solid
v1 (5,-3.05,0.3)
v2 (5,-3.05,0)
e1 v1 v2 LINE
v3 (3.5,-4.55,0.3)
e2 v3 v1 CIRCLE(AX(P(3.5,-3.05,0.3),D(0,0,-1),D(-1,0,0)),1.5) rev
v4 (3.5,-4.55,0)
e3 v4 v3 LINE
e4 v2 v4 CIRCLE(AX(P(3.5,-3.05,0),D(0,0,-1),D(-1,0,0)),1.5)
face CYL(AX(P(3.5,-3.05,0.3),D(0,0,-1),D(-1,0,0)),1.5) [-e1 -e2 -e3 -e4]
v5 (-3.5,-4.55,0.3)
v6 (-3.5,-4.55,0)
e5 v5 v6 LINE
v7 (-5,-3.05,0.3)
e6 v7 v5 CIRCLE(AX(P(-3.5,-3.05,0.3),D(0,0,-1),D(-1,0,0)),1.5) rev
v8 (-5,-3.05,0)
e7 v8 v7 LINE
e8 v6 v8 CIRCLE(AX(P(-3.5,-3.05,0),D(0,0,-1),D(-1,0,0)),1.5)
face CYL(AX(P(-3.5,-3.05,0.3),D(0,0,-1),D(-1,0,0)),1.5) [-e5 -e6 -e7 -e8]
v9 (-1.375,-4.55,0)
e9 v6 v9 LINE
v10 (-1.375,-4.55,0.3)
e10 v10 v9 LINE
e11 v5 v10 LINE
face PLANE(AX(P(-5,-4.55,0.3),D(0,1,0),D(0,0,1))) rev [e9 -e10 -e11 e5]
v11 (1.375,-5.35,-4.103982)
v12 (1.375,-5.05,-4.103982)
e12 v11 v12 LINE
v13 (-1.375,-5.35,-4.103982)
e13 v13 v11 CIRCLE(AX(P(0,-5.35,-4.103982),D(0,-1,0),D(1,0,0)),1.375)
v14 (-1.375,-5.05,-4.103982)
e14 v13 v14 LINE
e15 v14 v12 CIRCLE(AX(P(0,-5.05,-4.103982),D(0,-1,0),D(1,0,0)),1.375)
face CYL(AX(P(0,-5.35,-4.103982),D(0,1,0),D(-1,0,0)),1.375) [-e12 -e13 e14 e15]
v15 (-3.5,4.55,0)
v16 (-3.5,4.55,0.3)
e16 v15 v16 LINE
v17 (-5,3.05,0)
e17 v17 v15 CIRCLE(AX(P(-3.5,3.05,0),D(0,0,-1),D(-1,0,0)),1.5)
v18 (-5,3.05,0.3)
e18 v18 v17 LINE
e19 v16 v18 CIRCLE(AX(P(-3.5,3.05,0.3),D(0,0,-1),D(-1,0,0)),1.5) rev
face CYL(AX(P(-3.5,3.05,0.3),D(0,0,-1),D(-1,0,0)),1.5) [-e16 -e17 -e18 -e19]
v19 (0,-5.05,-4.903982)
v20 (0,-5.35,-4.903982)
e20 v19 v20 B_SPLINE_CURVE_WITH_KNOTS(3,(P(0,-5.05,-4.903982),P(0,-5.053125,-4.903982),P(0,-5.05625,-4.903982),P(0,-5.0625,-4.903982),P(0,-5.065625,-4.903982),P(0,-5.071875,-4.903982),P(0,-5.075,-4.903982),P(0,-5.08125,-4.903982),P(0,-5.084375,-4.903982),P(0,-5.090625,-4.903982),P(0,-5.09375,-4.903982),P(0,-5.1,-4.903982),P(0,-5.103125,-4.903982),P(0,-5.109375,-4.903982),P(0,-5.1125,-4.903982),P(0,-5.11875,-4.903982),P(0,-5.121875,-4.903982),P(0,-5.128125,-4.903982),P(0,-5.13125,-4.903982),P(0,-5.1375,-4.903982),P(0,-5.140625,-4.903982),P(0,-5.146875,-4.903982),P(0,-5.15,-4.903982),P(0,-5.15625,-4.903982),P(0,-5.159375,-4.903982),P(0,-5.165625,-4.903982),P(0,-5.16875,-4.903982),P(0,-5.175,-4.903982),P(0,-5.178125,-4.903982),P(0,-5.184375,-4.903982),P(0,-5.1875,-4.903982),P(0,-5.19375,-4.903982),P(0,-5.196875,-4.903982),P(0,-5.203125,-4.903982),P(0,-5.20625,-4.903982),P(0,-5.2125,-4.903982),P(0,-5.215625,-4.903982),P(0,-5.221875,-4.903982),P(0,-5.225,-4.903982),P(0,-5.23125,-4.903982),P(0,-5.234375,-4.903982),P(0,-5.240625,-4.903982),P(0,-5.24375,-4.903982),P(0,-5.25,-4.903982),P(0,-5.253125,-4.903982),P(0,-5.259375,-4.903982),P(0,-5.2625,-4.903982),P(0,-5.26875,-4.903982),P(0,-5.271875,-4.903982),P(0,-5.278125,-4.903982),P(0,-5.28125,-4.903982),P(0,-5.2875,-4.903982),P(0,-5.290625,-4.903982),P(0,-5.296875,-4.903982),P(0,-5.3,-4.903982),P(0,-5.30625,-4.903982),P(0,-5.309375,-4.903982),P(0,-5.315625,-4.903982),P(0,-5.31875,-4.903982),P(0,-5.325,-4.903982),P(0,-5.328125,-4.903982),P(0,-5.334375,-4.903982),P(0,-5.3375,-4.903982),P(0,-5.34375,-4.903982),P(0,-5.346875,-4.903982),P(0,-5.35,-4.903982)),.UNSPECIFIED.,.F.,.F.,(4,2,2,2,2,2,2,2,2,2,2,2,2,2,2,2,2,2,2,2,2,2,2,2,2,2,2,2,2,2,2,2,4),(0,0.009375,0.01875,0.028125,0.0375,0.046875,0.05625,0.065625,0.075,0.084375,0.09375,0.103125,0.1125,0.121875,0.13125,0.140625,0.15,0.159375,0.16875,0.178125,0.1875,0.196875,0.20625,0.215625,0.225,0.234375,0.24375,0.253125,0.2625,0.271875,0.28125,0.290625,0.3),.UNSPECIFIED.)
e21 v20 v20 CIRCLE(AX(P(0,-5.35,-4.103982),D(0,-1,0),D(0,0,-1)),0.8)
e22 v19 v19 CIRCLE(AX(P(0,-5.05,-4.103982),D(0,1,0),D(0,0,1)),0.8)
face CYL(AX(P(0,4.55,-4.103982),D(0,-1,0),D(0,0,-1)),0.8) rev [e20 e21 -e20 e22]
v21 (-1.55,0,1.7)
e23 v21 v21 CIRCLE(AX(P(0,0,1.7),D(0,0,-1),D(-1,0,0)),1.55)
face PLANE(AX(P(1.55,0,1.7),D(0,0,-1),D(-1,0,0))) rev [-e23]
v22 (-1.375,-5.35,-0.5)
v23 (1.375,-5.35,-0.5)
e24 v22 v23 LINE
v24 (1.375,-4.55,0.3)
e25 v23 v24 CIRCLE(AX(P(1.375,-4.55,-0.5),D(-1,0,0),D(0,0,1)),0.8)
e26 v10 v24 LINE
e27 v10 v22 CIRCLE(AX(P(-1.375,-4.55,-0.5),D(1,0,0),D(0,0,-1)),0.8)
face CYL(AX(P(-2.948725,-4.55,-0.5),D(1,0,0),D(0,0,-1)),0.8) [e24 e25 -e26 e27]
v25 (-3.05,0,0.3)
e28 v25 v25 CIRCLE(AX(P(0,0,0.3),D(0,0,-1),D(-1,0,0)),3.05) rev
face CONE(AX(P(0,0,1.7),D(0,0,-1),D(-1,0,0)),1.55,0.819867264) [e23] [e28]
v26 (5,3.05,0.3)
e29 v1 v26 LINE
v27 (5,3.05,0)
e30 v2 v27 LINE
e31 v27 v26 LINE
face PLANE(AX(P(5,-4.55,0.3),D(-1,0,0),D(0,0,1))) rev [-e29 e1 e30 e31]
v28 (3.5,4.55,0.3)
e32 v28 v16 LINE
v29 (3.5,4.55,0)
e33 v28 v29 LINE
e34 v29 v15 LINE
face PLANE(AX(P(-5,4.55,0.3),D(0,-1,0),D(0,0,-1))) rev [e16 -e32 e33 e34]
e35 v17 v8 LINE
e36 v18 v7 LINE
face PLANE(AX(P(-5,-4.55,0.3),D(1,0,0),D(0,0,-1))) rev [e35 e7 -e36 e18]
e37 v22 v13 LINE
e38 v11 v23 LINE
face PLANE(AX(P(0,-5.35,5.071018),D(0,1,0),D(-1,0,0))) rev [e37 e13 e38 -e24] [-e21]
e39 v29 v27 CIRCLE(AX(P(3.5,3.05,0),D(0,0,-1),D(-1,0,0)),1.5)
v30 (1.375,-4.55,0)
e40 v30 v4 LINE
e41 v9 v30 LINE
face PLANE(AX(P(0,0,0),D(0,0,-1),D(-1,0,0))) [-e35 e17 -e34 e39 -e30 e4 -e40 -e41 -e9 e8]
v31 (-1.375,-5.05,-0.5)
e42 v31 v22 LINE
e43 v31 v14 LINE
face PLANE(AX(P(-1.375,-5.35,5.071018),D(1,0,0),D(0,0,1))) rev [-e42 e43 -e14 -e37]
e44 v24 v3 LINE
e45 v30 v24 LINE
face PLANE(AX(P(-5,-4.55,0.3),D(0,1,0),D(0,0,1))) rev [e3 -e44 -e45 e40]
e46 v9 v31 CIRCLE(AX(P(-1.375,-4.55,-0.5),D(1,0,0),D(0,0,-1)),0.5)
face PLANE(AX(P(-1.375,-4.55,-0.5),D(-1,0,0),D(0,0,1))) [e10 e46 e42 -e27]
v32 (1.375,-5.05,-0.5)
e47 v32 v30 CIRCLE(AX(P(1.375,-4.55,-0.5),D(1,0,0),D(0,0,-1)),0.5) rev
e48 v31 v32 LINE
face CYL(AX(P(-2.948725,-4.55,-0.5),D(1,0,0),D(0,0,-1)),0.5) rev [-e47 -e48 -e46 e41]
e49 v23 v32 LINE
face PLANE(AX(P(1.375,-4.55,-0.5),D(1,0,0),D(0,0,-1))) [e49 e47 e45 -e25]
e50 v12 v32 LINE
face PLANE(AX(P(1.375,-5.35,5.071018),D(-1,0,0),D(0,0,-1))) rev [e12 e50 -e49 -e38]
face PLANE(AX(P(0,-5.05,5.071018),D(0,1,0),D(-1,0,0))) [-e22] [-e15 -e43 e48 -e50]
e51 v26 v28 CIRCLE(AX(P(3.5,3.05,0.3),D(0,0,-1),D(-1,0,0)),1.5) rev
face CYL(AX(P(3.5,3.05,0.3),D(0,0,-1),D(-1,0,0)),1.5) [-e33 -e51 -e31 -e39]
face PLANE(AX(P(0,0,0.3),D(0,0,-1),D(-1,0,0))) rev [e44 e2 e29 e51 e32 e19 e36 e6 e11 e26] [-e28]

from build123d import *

# Parameters (mm, degrees)
SKETCH1_W                  = 10
SKETCH1_H                  = 9.1
BASE_FLANGE1_DEPTH         = 0.3
TAB1_DEPTH                 = 0.3
SKETCHED_START             = -12
SKETCHED_BEND1_OUTLINE_W   = 2.75
SKETCHED_BEND1_OUTLINE_H   = 0.3
SKETCHED_BEND1_DEPTH       = 6.725504
SKETCHED_START_2           = -5.274496
SKETCHED_BEND1_2_OUTLINE_W = 2.75
SKETCHED_BEND1_2_OUTLINE_H = 0.3
SKETCHED_BEND1_2_DEPTH     = 0.074434719
SKETCHED_START_3           = -5.35
SKETCHED_BEND1_3_DEPTH     = 0.8
SKETCHED_START_4           = -1.375
SKETCHED_BEND1_4_DEPTH     = 2.75
FILLET1_R                  = 1.5
SKETCH13_R                 = 0.8
CUT_EXTRUDE2_DEPTH         = 13.370499101


with BuildPart() as part:
    # Base-Flange1: sheet metal written as solids
    # Sketch1 → Base-Flange1 (new body)
    with BuildSketch(Plane.XY):
        Rectangle(SKETCH1_W, SKETCH1_H)
    extrude(amount=BASE_FLANGE1_DEPTH)

    # Tab1: sheet metal written as solids
    # Sketch7 → Tab1 (add)
    with BuildSketch(Plane.XY):
        with BuildLine():
            Line((1.375, 0), (1.375, -9.175))
            ThreePointArc((1.375, -9.175), (0, -10.55), (-1.375, -9.175))
            Line((-1.375, -9.175), (-1.375, 0))
            ThreePointArc((-1.375, 0), (0, 1.375), (1.375, 0))
        make_face()
    extrude(amount=TAB1_DEPTH)

    # Sketched Bend1: read off the stored shape, not the designer's step
    # Sketched Bend1 outline → Sketched Bend1 (cut)
    with BuildSketch(Plane(origin=(0, 0, 0), x_dir=(1, 0, 0), z_dir=(0, 1, 0)).offset(SKETCHED_START)):
        with Locations((0, -0.15)):
            Rectangle(SKETCHED_BEND1_OUTLINE_W, SKETCHED_BEND1_OUTLINE_H)
    extrude(amount=SKETCHED_BEND1_DEPTH, mode=Mode.SUBTRACT)

    # Sketched Bend1 2 outline → Sketched Bend1 2 (cut)
    with BuildSketch(Plane(origin=(0, 0, 0), x_dir=(1, 0, 0), z_dir=(0, 1, 0)).offset(SKETCHED_START_2)):
        with Locations((0, -0.15)):
            Rectangle(SKETCHED_BEND1_2_OUTLINE_W, SKETCHED_BEND1_2_OUTLINE_H)
    extrude(amount=SKETCHED_BEND1_2_DEPTH, mode=Mode.SUBTRACT)

    # Sketched Bend1 3 outline → Sketched Bend1 3 (add)
    with BuildSketch(Plane(origin=(0, 0, 0), x_dir=(1, 0, 0), z_dir=(0, 1, 0)).offset(SKETCHED_START_3)):
        with BuildLine():
            Line((-1.375, 4.103982388), (-1.375, 0))
            Line((-1.375, 0), (1.375, 0))
            Line((1.375, 0), (1.375, 4.103982388))
            ThreePointArc((1.375, 4.103982388), (0, 5.478982388), (-1.375, 4.103982388))
        make_face()
    extrude(amount=SKETCHED_BEND1_3_DEPTH)

    # Sketched Bend1 4 outline → Sketched Bend1 4 (cut)
    with BuildSketch(Plane.YZ.offset(SKETCHED_START_4)):
        with BuildLine():
            Line((-5.05, -0.5), (-5.05, -7))
            Line((-5.05, -7), (-4.55, -7))
            Line((-4.55, -7), (-4.55, 0))
            ThreePointArc((-4.55, 0), (-4.903553391, -0.146446609), (-5.05, -0.5))
        make_face()
        with BuildLine():
            Line((-7, -7), (-5.349999999, -7))
            Line((-5.349999999, -7), (-5.35, -0.5))
            ThreePointArc((-5.35, -0.5), (-5.115685425, 0.065685425), (-4.55, 0.3))
            Line((-4.55, 0.3), (-3, 0.3))
            Line((-3, 0.3), (-3, 2))
            Line((-3, 2), (-5.200061281, 2))
            Line((-5.200061281, 2), (-5.200061281, 0))
            Line((-5.200061281, 0), (-7, 0))
            Line((-7, 0), (-7, -7))
        make_face()
    extrude(amount=SKETCHED_BEND1_4_DEPTH, mode=Mode.SUBTRACT)

    # Fillet1
    fillet1_edges = [part.edges().sort_by_distance(p)[0] for p in [
        (-5, 4.55, 0.15),
        (5, 4.55, 0.15),
        (5, -4.55, 0.15),
        (-5, -4.55, 0.15),
    ]]
    fillet(fillet1_edges, radius=FILLET1_R)

    # Sketch13 → Cut-Extrude2 (cut, through all)
    with BuildSketch(Plane.XZ.offset(5.35)):
        with Locations(Location((0, -4.103982388, 0), (0, 0, 270))):
            Circle(SKETCH13_R)
    extrude(amount=-CUT_EXTRUDE2_DEPTH, mode=Mode.SUBTRACT)

    # Sketch14 → Revolve1 (revolve)
    with BuildSketch(Plane(origin=(0, 0, 0), x_dir=(1, 0, 0), z_dir=(0, 1, 0)), mode=Mode.PRIVATE) as revolve1_sk:
        Polygon((0, -0.3), (3.05, -0.3), (1.55, -1.7), (0, -1.7), align=None)
    revolve(revolve1_sk.sketch.rotate(Axis((0, 0, -88.99), (0, 0, 1)), 180), axis=Axis((0, 0, -88.99), (0, 0, 1)))


solid = part.part
